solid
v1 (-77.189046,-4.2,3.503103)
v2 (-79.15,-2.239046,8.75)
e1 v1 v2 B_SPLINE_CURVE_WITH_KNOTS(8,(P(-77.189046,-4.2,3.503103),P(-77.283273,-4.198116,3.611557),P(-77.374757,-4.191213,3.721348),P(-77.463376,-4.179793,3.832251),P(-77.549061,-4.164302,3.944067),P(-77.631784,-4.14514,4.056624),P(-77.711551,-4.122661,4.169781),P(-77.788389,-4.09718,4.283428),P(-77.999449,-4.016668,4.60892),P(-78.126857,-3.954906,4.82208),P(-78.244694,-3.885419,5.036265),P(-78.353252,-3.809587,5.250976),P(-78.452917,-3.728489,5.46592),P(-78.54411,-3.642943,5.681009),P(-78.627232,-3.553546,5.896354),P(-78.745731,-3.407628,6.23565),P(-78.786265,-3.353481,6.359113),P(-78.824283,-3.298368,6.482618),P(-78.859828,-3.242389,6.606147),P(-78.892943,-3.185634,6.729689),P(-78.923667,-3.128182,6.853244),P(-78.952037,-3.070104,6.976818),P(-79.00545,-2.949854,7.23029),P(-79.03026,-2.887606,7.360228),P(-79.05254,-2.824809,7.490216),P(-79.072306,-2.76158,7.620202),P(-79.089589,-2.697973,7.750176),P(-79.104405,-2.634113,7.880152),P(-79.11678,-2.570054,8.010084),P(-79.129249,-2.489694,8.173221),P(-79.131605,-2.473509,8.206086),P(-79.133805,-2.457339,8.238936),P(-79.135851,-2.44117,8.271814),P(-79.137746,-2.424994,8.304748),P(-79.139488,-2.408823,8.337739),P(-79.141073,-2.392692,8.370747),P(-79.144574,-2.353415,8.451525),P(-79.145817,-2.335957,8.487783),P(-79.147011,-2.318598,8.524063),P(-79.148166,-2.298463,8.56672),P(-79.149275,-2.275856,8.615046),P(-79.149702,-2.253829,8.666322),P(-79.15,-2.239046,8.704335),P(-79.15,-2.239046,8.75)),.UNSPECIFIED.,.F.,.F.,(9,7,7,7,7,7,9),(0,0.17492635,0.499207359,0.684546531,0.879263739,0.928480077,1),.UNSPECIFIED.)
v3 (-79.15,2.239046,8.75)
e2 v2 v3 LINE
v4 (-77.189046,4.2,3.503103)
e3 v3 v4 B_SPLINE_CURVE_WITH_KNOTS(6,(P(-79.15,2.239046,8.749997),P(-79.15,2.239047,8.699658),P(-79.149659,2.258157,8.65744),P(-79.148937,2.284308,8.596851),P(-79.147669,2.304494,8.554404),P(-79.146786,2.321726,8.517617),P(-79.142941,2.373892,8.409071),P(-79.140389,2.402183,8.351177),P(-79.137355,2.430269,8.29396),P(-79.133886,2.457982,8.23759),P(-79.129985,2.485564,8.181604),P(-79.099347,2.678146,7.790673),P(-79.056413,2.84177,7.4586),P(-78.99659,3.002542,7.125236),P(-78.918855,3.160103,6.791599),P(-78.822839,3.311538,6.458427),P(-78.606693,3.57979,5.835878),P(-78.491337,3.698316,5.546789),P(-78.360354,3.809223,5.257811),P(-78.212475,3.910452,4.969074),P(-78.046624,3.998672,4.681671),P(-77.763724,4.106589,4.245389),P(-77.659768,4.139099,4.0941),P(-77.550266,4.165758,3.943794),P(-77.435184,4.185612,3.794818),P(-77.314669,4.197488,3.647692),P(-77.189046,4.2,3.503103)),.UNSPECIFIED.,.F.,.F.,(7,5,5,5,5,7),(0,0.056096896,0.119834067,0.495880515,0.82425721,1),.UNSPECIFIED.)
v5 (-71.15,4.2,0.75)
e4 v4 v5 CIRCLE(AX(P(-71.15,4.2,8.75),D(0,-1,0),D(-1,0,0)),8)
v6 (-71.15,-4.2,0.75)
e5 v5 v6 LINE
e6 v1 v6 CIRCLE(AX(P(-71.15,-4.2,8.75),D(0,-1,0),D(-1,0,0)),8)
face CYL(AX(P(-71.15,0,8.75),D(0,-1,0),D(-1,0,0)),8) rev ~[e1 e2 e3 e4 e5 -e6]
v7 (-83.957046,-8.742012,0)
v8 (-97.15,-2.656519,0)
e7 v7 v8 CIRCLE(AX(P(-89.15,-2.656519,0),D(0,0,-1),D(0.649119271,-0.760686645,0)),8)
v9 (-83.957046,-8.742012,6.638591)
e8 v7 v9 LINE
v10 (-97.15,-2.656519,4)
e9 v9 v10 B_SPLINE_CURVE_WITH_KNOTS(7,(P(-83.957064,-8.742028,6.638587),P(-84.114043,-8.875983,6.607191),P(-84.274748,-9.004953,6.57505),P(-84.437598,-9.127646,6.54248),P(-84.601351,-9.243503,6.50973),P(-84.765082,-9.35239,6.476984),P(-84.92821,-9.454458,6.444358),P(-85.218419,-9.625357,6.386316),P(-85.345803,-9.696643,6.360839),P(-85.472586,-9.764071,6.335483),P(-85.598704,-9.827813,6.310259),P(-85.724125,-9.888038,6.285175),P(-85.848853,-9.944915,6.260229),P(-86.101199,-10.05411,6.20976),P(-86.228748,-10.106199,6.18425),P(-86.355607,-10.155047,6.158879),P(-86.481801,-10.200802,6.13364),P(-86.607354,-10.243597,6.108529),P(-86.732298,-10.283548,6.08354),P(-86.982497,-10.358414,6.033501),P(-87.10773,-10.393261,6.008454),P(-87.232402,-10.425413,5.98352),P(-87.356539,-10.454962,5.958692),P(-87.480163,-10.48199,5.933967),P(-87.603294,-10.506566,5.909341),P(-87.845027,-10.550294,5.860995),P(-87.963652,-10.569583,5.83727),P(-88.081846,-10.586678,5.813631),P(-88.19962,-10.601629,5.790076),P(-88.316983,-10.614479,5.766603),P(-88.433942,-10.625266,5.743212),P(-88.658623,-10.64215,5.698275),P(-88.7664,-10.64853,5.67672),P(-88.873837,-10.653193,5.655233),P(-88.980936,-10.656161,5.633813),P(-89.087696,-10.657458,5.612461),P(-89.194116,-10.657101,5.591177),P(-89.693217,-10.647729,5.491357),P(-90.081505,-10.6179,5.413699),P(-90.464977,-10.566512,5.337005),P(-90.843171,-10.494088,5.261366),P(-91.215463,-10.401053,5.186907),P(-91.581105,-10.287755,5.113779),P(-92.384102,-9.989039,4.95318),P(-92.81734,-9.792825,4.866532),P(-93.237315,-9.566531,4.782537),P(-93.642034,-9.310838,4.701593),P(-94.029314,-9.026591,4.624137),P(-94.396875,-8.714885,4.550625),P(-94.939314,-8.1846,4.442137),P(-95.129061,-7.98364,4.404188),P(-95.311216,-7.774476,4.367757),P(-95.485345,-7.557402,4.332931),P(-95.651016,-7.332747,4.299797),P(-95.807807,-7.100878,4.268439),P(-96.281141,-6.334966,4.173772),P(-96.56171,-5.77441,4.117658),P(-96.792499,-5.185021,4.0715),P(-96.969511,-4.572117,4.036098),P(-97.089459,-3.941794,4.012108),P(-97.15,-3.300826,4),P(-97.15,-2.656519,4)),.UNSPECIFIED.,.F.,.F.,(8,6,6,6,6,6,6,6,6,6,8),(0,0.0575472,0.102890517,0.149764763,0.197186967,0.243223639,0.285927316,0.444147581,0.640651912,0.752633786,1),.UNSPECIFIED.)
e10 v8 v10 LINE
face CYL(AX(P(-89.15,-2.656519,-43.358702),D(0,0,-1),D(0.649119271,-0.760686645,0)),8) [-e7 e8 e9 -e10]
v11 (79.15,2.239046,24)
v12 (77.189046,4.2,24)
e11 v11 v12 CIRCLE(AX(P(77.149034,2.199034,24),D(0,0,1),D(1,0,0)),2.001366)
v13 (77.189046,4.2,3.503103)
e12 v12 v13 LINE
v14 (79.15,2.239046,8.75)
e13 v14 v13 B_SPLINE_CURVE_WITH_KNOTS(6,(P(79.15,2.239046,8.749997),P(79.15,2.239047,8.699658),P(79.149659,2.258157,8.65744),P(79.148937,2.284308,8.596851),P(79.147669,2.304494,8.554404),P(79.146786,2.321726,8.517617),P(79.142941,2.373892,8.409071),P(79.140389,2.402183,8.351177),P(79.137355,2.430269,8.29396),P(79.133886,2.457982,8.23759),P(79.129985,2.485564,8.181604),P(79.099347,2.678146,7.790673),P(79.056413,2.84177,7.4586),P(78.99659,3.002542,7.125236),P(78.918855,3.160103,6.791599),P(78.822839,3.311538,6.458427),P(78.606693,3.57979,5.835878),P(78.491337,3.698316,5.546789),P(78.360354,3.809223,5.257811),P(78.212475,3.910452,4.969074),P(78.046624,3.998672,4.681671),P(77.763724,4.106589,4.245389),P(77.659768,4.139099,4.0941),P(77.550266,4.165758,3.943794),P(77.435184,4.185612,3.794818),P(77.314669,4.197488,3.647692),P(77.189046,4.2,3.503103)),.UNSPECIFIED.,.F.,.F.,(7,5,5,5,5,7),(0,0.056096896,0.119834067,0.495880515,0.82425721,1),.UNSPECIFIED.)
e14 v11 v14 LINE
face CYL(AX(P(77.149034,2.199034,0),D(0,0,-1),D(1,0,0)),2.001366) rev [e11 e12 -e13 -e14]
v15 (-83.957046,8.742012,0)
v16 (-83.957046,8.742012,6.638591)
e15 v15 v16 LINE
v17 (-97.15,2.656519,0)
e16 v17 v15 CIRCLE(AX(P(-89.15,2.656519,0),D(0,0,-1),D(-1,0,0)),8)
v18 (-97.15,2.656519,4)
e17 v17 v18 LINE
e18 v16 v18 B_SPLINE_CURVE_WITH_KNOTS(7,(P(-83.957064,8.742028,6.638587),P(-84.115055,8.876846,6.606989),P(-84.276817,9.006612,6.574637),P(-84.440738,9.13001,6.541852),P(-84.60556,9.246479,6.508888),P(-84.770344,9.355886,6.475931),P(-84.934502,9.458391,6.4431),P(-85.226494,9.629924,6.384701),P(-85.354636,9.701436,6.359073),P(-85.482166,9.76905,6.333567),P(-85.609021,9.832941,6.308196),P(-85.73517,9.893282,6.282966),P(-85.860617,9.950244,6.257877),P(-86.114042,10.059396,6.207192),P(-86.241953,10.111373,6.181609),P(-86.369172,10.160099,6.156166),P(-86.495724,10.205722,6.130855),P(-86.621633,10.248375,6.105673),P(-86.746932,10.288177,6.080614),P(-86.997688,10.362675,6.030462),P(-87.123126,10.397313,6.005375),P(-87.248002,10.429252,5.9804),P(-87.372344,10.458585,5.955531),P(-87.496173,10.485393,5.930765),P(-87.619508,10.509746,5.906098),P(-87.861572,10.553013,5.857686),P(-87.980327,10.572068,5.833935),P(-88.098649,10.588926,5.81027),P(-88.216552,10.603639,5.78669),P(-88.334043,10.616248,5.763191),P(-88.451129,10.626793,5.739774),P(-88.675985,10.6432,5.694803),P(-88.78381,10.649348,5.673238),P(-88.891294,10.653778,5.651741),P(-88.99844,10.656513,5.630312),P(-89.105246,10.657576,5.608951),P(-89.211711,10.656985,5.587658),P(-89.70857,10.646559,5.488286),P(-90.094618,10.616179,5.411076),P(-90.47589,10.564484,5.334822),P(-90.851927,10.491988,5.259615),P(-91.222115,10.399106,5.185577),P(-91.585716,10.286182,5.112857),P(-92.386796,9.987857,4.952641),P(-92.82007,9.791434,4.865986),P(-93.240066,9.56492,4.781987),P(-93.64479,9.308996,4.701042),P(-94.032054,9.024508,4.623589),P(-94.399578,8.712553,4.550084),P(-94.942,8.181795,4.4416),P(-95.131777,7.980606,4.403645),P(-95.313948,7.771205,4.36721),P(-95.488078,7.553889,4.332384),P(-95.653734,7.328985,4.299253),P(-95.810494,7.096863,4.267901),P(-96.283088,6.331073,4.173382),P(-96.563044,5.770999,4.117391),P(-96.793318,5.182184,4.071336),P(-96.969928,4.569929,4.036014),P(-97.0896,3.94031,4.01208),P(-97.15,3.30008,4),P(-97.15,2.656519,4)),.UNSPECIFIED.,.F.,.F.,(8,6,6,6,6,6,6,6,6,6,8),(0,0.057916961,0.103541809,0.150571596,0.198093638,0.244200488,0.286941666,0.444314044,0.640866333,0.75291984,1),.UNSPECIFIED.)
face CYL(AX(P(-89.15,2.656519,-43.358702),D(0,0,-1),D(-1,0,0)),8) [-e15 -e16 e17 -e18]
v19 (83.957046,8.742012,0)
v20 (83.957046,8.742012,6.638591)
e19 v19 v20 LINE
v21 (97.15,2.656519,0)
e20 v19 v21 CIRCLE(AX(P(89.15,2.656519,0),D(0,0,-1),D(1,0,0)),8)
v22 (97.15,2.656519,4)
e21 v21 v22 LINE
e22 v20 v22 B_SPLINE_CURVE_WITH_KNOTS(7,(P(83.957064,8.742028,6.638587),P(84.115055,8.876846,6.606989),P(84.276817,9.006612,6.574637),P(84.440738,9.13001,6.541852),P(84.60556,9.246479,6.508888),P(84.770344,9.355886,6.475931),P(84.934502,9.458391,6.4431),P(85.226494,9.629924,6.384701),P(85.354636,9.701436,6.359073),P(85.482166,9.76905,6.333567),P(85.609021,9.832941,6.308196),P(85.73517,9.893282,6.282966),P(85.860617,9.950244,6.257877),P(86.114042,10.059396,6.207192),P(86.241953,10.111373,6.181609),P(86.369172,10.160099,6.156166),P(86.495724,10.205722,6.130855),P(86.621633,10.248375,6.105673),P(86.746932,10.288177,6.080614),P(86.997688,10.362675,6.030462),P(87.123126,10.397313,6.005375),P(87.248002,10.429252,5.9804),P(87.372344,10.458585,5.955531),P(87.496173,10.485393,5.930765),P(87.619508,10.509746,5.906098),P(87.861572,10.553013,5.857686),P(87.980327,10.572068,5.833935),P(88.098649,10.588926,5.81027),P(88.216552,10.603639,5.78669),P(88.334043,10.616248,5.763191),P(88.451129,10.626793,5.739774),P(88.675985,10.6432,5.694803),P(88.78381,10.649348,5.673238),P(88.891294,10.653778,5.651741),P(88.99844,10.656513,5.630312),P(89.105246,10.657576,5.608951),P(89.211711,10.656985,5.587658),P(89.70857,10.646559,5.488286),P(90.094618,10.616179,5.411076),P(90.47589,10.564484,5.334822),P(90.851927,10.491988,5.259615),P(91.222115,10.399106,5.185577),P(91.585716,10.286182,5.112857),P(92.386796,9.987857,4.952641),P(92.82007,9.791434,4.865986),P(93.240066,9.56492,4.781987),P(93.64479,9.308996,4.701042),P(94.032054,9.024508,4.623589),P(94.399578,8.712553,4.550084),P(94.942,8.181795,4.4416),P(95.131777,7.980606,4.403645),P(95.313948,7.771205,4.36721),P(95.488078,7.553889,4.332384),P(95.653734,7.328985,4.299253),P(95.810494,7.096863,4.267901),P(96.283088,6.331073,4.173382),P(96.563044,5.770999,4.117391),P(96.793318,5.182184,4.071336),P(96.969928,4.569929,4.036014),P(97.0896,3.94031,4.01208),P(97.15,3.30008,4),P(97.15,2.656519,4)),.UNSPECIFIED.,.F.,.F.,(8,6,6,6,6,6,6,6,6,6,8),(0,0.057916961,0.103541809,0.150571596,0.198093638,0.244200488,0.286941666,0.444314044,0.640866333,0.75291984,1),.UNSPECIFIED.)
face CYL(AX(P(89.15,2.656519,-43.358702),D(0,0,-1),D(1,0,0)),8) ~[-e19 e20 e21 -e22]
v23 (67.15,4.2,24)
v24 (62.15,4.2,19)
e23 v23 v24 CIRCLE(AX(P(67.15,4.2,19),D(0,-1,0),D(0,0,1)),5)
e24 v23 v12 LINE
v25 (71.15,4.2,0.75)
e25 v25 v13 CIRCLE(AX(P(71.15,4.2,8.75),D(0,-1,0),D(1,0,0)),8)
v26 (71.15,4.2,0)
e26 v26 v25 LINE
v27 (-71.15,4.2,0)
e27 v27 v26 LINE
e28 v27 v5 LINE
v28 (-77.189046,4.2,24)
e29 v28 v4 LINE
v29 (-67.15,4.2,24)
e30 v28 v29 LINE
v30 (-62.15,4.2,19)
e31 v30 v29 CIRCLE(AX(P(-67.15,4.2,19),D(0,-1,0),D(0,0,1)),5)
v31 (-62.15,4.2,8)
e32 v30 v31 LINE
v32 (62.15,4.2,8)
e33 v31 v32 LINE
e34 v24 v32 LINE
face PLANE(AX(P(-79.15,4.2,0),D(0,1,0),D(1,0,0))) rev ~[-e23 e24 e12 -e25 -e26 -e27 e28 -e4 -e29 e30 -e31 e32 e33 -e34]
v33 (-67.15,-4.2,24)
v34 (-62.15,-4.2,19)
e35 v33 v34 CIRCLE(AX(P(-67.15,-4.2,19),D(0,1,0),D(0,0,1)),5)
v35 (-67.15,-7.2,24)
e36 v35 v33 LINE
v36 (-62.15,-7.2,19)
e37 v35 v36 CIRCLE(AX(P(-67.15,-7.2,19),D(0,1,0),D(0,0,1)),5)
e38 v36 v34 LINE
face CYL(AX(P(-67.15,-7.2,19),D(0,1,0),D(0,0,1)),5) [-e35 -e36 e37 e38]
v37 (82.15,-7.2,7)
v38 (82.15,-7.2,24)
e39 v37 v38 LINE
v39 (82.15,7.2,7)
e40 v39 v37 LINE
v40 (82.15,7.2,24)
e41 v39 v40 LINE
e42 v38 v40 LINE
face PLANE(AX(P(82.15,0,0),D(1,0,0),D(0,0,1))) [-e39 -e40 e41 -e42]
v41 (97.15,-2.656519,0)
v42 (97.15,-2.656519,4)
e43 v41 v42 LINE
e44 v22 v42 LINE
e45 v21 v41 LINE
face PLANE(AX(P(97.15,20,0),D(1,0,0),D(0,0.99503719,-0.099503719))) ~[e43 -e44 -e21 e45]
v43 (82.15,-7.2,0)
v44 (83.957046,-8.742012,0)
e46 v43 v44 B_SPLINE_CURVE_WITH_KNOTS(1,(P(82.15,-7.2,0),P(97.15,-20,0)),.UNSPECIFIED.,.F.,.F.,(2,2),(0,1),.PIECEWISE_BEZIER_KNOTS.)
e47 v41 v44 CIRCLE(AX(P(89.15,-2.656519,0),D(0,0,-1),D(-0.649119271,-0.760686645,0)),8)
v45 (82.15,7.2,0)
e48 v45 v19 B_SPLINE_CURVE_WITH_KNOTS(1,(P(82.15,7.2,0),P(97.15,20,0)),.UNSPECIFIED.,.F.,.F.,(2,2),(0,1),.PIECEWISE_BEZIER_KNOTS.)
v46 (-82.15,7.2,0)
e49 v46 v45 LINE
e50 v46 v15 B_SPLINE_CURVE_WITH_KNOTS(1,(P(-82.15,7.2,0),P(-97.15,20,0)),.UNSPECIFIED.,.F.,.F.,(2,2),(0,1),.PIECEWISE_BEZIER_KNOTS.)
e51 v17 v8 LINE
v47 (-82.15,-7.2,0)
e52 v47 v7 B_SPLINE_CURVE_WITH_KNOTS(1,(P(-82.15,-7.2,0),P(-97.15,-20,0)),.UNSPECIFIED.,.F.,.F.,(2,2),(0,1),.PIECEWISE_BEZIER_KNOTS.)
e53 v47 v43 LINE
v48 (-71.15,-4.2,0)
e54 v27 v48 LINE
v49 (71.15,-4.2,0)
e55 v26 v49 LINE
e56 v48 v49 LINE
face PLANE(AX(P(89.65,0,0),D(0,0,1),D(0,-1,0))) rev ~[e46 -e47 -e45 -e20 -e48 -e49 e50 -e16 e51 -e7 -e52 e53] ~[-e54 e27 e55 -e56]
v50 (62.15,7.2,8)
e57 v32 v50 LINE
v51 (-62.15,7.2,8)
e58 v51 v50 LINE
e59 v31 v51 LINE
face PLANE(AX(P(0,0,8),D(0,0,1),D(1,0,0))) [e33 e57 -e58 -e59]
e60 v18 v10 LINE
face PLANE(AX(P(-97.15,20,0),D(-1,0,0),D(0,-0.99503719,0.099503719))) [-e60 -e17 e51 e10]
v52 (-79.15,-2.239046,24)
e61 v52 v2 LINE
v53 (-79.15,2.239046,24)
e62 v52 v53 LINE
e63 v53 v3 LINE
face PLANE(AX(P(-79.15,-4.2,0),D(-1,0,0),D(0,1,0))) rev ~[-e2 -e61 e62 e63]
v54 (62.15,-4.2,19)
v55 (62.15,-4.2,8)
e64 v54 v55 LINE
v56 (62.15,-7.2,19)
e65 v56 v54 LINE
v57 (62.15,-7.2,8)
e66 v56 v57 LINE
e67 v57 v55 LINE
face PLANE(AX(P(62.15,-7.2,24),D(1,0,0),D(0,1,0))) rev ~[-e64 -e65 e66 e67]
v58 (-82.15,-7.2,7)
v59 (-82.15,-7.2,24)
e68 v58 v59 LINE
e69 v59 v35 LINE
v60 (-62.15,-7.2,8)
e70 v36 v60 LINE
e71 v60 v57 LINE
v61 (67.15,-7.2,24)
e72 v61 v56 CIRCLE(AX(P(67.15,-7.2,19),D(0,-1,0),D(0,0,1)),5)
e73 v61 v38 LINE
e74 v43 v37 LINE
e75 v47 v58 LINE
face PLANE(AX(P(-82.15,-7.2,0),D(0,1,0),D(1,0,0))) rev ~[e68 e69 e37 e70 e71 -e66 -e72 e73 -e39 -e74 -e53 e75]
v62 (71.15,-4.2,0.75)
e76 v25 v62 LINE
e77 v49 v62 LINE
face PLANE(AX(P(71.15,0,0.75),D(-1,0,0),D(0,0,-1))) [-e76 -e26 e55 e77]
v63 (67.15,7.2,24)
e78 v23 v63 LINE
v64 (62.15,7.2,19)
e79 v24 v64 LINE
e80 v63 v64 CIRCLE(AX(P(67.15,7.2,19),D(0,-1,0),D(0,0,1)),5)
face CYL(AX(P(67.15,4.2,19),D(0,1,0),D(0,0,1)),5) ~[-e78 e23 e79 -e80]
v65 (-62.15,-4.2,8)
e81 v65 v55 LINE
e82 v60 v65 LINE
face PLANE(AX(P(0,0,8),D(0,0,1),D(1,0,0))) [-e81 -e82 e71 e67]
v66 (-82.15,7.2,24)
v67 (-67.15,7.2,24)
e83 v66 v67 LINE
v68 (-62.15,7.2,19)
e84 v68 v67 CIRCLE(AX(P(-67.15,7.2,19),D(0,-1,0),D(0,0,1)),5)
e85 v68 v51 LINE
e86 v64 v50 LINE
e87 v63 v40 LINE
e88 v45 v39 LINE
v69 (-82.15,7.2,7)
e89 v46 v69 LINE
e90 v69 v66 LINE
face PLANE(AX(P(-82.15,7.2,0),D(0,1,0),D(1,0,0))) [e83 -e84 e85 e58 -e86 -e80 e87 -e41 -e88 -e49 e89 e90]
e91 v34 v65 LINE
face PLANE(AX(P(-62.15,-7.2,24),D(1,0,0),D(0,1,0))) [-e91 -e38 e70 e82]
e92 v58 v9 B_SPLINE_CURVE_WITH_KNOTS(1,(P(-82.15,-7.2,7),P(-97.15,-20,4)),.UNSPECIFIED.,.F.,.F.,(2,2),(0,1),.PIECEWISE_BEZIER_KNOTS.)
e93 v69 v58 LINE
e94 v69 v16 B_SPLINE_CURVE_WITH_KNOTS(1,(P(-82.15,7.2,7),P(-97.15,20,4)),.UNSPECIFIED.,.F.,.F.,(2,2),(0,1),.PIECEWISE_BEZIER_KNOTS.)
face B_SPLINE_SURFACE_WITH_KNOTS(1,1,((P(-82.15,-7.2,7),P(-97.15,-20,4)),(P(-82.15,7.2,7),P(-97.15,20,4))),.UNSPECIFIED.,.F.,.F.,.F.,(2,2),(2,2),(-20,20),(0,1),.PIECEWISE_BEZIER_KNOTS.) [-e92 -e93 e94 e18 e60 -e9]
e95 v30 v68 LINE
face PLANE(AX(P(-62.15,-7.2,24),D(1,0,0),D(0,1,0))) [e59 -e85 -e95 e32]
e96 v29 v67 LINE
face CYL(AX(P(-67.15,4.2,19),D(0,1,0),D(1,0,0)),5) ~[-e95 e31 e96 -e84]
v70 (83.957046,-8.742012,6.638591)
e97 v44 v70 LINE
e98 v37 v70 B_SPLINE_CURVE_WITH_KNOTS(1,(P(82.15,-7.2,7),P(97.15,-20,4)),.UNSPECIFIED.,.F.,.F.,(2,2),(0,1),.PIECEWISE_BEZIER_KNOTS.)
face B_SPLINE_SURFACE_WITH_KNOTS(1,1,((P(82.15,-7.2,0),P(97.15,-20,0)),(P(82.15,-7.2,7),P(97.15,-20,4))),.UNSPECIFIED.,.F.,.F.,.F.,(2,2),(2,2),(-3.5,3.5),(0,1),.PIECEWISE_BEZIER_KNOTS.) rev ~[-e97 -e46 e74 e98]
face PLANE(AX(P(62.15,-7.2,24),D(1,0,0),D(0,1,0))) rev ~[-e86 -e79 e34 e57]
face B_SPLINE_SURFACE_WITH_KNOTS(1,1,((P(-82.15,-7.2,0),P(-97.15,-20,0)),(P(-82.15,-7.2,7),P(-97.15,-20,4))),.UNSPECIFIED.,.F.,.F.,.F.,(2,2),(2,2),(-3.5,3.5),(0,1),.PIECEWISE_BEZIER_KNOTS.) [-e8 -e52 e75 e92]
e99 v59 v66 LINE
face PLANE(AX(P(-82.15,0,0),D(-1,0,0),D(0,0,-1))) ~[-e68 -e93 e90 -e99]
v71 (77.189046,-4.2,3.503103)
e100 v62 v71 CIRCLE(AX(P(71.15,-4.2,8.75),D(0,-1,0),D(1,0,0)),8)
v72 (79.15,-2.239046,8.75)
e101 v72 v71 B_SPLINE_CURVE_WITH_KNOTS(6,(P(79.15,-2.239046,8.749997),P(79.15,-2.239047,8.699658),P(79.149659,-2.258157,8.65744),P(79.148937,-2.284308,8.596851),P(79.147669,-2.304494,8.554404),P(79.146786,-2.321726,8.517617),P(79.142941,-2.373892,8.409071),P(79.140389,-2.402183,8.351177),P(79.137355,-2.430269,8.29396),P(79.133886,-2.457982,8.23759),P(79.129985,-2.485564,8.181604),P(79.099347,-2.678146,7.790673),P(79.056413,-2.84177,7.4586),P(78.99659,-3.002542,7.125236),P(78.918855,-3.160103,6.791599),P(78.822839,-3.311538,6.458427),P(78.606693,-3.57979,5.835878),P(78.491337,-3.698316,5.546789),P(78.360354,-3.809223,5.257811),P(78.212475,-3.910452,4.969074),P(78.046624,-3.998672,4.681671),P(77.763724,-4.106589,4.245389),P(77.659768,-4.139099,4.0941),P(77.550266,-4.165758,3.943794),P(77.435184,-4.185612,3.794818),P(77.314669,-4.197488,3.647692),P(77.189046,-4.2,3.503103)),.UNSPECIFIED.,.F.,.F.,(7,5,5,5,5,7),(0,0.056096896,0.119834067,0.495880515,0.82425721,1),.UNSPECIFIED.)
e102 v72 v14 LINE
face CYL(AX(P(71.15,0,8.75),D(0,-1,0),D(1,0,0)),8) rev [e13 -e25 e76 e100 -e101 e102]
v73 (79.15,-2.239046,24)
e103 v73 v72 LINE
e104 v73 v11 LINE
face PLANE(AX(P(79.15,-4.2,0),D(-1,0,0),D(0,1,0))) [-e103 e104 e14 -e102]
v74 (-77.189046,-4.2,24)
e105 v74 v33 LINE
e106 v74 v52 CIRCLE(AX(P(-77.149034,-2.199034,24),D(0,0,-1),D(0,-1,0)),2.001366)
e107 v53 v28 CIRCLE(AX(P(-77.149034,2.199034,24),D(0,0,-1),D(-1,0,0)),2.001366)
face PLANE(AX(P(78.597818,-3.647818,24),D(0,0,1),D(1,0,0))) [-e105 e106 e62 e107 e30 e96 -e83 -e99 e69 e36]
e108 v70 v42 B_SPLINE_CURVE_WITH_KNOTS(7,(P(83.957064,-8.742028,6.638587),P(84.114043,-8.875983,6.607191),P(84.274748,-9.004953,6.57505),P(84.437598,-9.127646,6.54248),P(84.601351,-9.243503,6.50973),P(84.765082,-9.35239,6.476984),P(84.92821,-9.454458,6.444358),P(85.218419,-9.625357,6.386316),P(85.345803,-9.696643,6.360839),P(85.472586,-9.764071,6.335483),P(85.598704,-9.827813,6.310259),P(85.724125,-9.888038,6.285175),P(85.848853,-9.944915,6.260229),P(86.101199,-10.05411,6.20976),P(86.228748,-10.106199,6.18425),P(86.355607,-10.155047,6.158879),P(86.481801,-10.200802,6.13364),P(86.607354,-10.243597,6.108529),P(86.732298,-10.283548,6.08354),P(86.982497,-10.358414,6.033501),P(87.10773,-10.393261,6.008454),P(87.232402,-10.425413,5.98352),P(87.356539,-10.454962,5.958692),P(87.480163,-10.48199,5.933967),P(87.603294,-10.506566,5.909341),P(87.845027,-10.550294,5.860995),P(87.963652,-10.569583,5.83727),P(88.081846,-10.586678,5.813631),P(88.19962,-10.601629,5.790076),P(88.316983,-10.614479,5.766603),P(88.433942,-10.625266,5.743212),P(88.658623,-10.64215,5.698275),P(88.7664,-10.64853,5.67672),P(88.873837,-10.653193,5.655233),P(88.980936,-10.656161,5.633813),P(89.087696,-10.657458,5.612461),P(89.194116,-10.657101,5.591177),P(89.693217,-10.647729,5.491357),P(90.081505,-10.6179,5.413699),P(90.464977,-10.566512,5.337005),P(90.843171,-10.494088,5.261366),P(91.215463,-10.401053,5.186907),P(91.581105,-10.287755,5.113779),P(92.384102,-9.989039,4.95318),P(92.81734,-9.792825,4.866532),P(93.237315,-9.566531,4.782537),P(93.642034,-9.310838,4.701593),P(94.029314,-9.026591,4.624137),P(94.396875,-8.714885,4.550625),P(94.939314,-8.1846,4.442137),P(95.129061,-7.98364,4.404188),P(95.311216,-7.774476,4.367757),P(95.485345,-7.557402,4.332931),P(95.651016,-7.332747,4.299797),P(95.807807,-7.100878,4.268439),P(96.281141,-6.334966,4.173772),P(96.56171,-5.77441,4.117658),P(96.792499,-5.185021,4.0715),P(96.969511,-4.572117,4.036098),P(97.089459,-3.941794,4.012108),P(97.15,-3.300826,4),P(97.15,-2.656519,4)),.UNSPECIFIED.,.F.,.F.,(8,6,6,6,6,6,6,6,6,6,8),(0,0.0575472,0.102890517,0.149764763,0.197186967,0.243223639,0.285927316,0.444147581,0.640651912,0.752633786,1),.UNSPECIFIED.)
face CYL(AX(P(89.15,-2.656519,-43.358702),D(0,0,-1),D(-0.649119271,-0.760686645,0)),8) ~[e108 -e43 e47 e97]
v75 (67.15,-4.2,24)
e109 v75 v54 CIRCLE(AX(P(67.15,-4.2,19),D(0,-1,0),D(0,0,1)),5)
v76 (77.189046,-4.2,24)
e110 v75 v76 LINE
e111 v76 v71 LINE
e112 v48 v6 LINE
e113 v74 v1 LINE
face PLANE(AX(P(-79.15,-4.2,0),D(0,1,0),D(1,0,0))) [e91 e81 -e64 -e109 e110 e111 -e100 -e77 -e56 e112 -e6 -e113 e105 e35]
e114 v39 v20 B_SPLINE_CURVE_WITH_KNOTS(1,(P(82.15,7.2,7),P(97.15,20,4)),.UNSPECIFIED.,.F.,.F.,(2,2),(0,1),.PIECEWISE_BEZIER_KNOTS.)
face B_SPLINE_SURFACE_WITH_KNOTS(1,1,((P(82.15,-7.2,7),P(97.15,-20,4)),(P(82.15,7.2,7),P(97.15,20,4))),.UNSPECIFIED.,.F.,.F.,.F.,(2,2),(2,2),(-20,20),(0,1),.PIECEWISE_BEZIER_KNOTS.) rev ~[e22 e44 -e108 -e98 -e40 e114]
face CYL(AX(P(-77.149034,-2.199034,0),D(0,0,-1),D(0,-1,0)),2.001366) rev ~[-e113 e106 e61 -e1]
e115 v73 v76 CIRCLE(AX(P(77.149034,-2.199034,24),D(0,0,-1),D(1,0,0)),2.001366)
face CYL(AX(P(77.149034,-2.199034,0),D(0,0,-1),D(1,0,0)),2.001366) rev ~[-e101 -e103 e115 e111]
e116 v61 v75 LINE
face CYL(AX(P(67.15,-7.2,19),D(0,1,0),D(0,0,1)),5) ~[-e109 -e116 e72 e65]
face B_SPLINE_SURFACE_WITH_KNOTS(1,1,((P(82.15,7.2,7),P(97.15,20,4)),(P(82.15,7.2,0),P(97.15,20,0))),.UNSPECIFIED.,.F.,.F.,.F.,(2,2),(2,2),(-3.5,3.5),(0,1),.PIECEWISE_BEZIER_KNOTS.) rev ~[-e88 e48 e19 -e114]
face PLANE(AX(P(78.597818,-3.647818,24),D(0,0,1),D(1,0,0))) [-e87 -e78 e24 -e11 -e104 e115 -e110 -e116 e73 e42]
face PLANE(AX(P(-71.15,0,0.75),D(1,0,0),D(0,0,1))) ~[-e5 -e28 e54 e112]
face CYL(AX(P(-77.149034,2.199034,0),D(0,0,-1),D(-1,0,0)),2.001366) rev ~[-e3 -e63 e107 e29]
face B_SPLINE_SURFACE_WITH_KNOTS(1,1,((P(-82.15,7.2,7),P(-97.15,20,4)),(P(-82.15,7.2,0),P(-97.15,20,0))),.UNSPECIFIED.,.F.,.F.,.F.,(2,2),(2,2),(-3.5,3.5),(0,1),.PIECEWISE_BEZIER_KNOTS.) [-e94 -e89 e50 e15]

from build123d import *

# Parameters (mm, degrees)
F1_W         = 164.3
F1_H         = 14.4
F1_W_2       = 158.3
F1_H_2       = 8.4
F2_DEPTH     = 24
F3_T1_DEPTH  = 24
F5_DEPTH     = 4.35
F6_W         = 14.4
F6_H         = 7
F8_W         = 40
F8_H         = 4
F10_T1_DEPTH = 90.717403587
F11_W        = 124.3
F11_H        = 14.4
F12_DEPTH    = 16
F13_R        = 5


# Not quite as in the source:
# - a fillet or chamfer that OpenCascade refuses, or shapes differently, is made with other operations: its cross-section is extruded or revolved along the edge and cut away or added
# - a pattern or mirror of a feature is missing from the dataset's text; its kind, count and spacing are read off the source's solid


with BuildPart() as f2:
    # F1 (on Top) → F2 (new body)
    with BuildSketch(Plane.XY):
        Rectangle(F1_W, F1_H)
        Rectangle(F1_W_2, F1_H_2, mode=Mode.SUBTRACT)
    extrude(amount=F2_DEPTH)

    # F3: fillet of radius 2 on 4 edges, made by hand

    # F3_s2 → F3_t1 (join)
    with BuildSketch(Plane.XY):
        with BuildLine():
            ThreePointArc((79.1504, -2.1990343146), (78.5642135624, -3.6142135624), (77.1490343146, -4.2004))
            Line((77.1490343146, -4.2004), (77.1490343146, -4.4005365685))
            ThreePointArc((77.1490343146, -4.4005365685), (78.1495171573, -4.4001365685), (79.15, -4.4001365685))
            Line((79.15, -4.4001365685), (79.3501365685, -4.2))
            ThreePointArc((79.3501365685, -4.2), (79.3501365685, -3.1995171573), (79.3505365685, -2.1990343146))
            Line((79.3505365685, -2.1990343146), (79.1504, -2.1990343146))
        make_face()
        with BuildLine():
            ThreePointArc((79.1504, 2.1990343146), (78.5642135624, 3.6142135624), (77.1490343146, 4.2004))
            Line((77.1490343146, 4.2004), (77.1490343146, 4.4005365685))
            ThreePointArc((77.1490343146, 4.4005365685), (78.1495171573, 4.4001365685), (79.15, 4.4001365685))
            Line((79.15, 4.4001365685), (79.3501365685, 4.2))
            ThreePointArc((79.3501365685, 4.2), (79.3501365685, 3.1995171573), (79.3505365685, 2.1990343146))
            Line((79.3505365685, 2.1990343146), (79.1504, 2.1990343146))
        make_face()
        with BuildLine():
            ThreePointArc((-77.1490343146, -4.2004), (-78.5642135624, -3.6142135624), (-79.1504, -2.1990343146))
            Line((-79.1504, -2.1990343146), (-79.3505365685, -2.1990343146))
            ThreePointArc((-79.3505365685, -2.1990343146), (-79.3501365685, -3.1995171573), (-79.3501365685, -4.2))
            Line((-79.3501365685, -4.2), (-79.15, -4.4001365685))
            ThreePointArc((-79.15, -4.4001365685), (-78.1495171573, -4.4001365685), (-77.1490343146, -4.4005365685))
            Line((-77.1490343146, -4.4005365685), (-77.1490343146, -4.2004))
        make_face()
        with BuildLine():
            ThreePointArc((-79.1504, 2.1990343146), (-78.5642135624, 3.6142135624), (-77.1490343146, 4.2004))
            Line((-77.1490343146, 4.2004), (-77.1490343146, 4.4005365685))
            ThreePointArc((-77.1490343146, 4.4005365685), (-78.1495171573, 4.4001365685), (-79.15, 4.4001365685))
            Line((-79.15, 4.4001365685), (-79.3501365685, 4.2))
            ThreePointArc((-79.3501365685, 4.2), (-79.3501365685, 3.1995171573), (-79.3505365685, 2.1990343146))
            Line((-79.3505365685, 2.1990343146), (-79.1504, 2.1990343146))
        make_face()
    extrude(amount=F3_T1_DEPTH)

    # F4 (on Front) → F5 (join, symmetric)
    with BuildSketch(Plane.XZ):
        with BuildLine():
            ThreePointArc((79.15, 8.75), (76.8068542495, 3.0931457505), (71.15, 0.75))
            Line((71.15, 0.75), (71.15, 0))
            Line((71.15, 0), (82.15, 0))
            Line((82.15, 0), (82.15, 8.75))
            Line((82.15, 8.75), (79.15, 8.75))
        make_face()
    f5 = extrude(amount=F5_DEPTH, both=True)

    # F5_copies: F5 across plane
    add(f5.mirror(Plane(origin=(0, 0, 0), x_dir=(0, 0, -1), z_dir=(-1, 0, 0))))

    # F6 (on face) → F9 section 0
    with BuildSketch(Plane(origin=(-82.15, 0, 0), x_dir=(0, -1, 0), z_dir=(-1, 0, 0))):
        with Locations((0, 3.5)):
            Rectangle(F6_W, F6_H)
    # F8 (on offset) → F9 section 1
    with BuildSketch(Plane(origin=(-97.15, 0, 0), x_dir=(0, -1, 0), z_dir=(-1, 0, 0))):
        with Locations((0, 2)):
            Rectangle(F8_W, F8_H)
    f9 = loft()

    # F9_copies: F9 across plane
    add(f9.mirror(Plane(origin=(0, 0, 0), x_dir=(0, 0, 1), z_dir=(1, 0, 0))))

    # F10: fillet of radius 8 on 4 edges, made by hand

    # F10_s2 → F10_t1 (cut)
    with BuildSketch(Plane.XY.offset(-43.3587017935)):
        with BuildLine():
            ThreePointArc((-97.15, 2.6565192826), (-92.500848152, 9.9209405715), (-83.9570458344, 8.7420124454))
            Line((-83.9570458344, 8.7420124454), (-97.15, 20))
            Line((-97.15, 20), (-97.15, 2.6565192826))
        make_face()
        with BuildLine():
            ThreePointArc((-83.9570458344, -8.7420124454), (-92.500848152, -9.9209405715), (-97.15, -2.6565192826))
            Line((-97.15, -2.6565192826), (-97.15, -20))
            Line((-97.15, -20), (-83.9570458344, -8.7420124454))
        make_face()
        with BuildLine():
            ThreePointArc((83.9570458344, -8.7420124454), (92.500848152, -9.9209405715), (97.15, -2.6565192826))
            Line((97.15, -2.6565192826), (97.15, -20))
            Line((97.15, -20), (83.9570458344, -8.7420124454))
        make_face()
        with BuildLine():
            ThreePointArc((97.15, 2.6565192826), (92.500848152, 9.9209405715), (83.9570458344, 8.7420124454))
            Line((83.9570458344, 8.7420124454), (97.15, 20))
            Line((97.15, 20), (97.15, 2.6565192826))
        make_face()
    extrude(amount=F10_T1_DEPTH, mode=Mode.SUBTRACT)

    # F11 (on face) → F12 (cut)
    with BuildSketch(Plane.XY.offset(24)):
        Rectangle(F11_W, F11_H)
    extrude(amount=-F12_DEPTH, mode=Mode.SUBTRACT)

    # F13
    f13_edges = [f2.edges().sort_by_distance(p)[0] for p in [
        (-62.15, 5.7, 24),
        (-62.15, -5.7, 24),
        (62.15, 5.7, 24),
        (62.15, -5.7, 24),
    ]]
    fillet(f13_edges, radius=F13_R)


solid = f2.part
